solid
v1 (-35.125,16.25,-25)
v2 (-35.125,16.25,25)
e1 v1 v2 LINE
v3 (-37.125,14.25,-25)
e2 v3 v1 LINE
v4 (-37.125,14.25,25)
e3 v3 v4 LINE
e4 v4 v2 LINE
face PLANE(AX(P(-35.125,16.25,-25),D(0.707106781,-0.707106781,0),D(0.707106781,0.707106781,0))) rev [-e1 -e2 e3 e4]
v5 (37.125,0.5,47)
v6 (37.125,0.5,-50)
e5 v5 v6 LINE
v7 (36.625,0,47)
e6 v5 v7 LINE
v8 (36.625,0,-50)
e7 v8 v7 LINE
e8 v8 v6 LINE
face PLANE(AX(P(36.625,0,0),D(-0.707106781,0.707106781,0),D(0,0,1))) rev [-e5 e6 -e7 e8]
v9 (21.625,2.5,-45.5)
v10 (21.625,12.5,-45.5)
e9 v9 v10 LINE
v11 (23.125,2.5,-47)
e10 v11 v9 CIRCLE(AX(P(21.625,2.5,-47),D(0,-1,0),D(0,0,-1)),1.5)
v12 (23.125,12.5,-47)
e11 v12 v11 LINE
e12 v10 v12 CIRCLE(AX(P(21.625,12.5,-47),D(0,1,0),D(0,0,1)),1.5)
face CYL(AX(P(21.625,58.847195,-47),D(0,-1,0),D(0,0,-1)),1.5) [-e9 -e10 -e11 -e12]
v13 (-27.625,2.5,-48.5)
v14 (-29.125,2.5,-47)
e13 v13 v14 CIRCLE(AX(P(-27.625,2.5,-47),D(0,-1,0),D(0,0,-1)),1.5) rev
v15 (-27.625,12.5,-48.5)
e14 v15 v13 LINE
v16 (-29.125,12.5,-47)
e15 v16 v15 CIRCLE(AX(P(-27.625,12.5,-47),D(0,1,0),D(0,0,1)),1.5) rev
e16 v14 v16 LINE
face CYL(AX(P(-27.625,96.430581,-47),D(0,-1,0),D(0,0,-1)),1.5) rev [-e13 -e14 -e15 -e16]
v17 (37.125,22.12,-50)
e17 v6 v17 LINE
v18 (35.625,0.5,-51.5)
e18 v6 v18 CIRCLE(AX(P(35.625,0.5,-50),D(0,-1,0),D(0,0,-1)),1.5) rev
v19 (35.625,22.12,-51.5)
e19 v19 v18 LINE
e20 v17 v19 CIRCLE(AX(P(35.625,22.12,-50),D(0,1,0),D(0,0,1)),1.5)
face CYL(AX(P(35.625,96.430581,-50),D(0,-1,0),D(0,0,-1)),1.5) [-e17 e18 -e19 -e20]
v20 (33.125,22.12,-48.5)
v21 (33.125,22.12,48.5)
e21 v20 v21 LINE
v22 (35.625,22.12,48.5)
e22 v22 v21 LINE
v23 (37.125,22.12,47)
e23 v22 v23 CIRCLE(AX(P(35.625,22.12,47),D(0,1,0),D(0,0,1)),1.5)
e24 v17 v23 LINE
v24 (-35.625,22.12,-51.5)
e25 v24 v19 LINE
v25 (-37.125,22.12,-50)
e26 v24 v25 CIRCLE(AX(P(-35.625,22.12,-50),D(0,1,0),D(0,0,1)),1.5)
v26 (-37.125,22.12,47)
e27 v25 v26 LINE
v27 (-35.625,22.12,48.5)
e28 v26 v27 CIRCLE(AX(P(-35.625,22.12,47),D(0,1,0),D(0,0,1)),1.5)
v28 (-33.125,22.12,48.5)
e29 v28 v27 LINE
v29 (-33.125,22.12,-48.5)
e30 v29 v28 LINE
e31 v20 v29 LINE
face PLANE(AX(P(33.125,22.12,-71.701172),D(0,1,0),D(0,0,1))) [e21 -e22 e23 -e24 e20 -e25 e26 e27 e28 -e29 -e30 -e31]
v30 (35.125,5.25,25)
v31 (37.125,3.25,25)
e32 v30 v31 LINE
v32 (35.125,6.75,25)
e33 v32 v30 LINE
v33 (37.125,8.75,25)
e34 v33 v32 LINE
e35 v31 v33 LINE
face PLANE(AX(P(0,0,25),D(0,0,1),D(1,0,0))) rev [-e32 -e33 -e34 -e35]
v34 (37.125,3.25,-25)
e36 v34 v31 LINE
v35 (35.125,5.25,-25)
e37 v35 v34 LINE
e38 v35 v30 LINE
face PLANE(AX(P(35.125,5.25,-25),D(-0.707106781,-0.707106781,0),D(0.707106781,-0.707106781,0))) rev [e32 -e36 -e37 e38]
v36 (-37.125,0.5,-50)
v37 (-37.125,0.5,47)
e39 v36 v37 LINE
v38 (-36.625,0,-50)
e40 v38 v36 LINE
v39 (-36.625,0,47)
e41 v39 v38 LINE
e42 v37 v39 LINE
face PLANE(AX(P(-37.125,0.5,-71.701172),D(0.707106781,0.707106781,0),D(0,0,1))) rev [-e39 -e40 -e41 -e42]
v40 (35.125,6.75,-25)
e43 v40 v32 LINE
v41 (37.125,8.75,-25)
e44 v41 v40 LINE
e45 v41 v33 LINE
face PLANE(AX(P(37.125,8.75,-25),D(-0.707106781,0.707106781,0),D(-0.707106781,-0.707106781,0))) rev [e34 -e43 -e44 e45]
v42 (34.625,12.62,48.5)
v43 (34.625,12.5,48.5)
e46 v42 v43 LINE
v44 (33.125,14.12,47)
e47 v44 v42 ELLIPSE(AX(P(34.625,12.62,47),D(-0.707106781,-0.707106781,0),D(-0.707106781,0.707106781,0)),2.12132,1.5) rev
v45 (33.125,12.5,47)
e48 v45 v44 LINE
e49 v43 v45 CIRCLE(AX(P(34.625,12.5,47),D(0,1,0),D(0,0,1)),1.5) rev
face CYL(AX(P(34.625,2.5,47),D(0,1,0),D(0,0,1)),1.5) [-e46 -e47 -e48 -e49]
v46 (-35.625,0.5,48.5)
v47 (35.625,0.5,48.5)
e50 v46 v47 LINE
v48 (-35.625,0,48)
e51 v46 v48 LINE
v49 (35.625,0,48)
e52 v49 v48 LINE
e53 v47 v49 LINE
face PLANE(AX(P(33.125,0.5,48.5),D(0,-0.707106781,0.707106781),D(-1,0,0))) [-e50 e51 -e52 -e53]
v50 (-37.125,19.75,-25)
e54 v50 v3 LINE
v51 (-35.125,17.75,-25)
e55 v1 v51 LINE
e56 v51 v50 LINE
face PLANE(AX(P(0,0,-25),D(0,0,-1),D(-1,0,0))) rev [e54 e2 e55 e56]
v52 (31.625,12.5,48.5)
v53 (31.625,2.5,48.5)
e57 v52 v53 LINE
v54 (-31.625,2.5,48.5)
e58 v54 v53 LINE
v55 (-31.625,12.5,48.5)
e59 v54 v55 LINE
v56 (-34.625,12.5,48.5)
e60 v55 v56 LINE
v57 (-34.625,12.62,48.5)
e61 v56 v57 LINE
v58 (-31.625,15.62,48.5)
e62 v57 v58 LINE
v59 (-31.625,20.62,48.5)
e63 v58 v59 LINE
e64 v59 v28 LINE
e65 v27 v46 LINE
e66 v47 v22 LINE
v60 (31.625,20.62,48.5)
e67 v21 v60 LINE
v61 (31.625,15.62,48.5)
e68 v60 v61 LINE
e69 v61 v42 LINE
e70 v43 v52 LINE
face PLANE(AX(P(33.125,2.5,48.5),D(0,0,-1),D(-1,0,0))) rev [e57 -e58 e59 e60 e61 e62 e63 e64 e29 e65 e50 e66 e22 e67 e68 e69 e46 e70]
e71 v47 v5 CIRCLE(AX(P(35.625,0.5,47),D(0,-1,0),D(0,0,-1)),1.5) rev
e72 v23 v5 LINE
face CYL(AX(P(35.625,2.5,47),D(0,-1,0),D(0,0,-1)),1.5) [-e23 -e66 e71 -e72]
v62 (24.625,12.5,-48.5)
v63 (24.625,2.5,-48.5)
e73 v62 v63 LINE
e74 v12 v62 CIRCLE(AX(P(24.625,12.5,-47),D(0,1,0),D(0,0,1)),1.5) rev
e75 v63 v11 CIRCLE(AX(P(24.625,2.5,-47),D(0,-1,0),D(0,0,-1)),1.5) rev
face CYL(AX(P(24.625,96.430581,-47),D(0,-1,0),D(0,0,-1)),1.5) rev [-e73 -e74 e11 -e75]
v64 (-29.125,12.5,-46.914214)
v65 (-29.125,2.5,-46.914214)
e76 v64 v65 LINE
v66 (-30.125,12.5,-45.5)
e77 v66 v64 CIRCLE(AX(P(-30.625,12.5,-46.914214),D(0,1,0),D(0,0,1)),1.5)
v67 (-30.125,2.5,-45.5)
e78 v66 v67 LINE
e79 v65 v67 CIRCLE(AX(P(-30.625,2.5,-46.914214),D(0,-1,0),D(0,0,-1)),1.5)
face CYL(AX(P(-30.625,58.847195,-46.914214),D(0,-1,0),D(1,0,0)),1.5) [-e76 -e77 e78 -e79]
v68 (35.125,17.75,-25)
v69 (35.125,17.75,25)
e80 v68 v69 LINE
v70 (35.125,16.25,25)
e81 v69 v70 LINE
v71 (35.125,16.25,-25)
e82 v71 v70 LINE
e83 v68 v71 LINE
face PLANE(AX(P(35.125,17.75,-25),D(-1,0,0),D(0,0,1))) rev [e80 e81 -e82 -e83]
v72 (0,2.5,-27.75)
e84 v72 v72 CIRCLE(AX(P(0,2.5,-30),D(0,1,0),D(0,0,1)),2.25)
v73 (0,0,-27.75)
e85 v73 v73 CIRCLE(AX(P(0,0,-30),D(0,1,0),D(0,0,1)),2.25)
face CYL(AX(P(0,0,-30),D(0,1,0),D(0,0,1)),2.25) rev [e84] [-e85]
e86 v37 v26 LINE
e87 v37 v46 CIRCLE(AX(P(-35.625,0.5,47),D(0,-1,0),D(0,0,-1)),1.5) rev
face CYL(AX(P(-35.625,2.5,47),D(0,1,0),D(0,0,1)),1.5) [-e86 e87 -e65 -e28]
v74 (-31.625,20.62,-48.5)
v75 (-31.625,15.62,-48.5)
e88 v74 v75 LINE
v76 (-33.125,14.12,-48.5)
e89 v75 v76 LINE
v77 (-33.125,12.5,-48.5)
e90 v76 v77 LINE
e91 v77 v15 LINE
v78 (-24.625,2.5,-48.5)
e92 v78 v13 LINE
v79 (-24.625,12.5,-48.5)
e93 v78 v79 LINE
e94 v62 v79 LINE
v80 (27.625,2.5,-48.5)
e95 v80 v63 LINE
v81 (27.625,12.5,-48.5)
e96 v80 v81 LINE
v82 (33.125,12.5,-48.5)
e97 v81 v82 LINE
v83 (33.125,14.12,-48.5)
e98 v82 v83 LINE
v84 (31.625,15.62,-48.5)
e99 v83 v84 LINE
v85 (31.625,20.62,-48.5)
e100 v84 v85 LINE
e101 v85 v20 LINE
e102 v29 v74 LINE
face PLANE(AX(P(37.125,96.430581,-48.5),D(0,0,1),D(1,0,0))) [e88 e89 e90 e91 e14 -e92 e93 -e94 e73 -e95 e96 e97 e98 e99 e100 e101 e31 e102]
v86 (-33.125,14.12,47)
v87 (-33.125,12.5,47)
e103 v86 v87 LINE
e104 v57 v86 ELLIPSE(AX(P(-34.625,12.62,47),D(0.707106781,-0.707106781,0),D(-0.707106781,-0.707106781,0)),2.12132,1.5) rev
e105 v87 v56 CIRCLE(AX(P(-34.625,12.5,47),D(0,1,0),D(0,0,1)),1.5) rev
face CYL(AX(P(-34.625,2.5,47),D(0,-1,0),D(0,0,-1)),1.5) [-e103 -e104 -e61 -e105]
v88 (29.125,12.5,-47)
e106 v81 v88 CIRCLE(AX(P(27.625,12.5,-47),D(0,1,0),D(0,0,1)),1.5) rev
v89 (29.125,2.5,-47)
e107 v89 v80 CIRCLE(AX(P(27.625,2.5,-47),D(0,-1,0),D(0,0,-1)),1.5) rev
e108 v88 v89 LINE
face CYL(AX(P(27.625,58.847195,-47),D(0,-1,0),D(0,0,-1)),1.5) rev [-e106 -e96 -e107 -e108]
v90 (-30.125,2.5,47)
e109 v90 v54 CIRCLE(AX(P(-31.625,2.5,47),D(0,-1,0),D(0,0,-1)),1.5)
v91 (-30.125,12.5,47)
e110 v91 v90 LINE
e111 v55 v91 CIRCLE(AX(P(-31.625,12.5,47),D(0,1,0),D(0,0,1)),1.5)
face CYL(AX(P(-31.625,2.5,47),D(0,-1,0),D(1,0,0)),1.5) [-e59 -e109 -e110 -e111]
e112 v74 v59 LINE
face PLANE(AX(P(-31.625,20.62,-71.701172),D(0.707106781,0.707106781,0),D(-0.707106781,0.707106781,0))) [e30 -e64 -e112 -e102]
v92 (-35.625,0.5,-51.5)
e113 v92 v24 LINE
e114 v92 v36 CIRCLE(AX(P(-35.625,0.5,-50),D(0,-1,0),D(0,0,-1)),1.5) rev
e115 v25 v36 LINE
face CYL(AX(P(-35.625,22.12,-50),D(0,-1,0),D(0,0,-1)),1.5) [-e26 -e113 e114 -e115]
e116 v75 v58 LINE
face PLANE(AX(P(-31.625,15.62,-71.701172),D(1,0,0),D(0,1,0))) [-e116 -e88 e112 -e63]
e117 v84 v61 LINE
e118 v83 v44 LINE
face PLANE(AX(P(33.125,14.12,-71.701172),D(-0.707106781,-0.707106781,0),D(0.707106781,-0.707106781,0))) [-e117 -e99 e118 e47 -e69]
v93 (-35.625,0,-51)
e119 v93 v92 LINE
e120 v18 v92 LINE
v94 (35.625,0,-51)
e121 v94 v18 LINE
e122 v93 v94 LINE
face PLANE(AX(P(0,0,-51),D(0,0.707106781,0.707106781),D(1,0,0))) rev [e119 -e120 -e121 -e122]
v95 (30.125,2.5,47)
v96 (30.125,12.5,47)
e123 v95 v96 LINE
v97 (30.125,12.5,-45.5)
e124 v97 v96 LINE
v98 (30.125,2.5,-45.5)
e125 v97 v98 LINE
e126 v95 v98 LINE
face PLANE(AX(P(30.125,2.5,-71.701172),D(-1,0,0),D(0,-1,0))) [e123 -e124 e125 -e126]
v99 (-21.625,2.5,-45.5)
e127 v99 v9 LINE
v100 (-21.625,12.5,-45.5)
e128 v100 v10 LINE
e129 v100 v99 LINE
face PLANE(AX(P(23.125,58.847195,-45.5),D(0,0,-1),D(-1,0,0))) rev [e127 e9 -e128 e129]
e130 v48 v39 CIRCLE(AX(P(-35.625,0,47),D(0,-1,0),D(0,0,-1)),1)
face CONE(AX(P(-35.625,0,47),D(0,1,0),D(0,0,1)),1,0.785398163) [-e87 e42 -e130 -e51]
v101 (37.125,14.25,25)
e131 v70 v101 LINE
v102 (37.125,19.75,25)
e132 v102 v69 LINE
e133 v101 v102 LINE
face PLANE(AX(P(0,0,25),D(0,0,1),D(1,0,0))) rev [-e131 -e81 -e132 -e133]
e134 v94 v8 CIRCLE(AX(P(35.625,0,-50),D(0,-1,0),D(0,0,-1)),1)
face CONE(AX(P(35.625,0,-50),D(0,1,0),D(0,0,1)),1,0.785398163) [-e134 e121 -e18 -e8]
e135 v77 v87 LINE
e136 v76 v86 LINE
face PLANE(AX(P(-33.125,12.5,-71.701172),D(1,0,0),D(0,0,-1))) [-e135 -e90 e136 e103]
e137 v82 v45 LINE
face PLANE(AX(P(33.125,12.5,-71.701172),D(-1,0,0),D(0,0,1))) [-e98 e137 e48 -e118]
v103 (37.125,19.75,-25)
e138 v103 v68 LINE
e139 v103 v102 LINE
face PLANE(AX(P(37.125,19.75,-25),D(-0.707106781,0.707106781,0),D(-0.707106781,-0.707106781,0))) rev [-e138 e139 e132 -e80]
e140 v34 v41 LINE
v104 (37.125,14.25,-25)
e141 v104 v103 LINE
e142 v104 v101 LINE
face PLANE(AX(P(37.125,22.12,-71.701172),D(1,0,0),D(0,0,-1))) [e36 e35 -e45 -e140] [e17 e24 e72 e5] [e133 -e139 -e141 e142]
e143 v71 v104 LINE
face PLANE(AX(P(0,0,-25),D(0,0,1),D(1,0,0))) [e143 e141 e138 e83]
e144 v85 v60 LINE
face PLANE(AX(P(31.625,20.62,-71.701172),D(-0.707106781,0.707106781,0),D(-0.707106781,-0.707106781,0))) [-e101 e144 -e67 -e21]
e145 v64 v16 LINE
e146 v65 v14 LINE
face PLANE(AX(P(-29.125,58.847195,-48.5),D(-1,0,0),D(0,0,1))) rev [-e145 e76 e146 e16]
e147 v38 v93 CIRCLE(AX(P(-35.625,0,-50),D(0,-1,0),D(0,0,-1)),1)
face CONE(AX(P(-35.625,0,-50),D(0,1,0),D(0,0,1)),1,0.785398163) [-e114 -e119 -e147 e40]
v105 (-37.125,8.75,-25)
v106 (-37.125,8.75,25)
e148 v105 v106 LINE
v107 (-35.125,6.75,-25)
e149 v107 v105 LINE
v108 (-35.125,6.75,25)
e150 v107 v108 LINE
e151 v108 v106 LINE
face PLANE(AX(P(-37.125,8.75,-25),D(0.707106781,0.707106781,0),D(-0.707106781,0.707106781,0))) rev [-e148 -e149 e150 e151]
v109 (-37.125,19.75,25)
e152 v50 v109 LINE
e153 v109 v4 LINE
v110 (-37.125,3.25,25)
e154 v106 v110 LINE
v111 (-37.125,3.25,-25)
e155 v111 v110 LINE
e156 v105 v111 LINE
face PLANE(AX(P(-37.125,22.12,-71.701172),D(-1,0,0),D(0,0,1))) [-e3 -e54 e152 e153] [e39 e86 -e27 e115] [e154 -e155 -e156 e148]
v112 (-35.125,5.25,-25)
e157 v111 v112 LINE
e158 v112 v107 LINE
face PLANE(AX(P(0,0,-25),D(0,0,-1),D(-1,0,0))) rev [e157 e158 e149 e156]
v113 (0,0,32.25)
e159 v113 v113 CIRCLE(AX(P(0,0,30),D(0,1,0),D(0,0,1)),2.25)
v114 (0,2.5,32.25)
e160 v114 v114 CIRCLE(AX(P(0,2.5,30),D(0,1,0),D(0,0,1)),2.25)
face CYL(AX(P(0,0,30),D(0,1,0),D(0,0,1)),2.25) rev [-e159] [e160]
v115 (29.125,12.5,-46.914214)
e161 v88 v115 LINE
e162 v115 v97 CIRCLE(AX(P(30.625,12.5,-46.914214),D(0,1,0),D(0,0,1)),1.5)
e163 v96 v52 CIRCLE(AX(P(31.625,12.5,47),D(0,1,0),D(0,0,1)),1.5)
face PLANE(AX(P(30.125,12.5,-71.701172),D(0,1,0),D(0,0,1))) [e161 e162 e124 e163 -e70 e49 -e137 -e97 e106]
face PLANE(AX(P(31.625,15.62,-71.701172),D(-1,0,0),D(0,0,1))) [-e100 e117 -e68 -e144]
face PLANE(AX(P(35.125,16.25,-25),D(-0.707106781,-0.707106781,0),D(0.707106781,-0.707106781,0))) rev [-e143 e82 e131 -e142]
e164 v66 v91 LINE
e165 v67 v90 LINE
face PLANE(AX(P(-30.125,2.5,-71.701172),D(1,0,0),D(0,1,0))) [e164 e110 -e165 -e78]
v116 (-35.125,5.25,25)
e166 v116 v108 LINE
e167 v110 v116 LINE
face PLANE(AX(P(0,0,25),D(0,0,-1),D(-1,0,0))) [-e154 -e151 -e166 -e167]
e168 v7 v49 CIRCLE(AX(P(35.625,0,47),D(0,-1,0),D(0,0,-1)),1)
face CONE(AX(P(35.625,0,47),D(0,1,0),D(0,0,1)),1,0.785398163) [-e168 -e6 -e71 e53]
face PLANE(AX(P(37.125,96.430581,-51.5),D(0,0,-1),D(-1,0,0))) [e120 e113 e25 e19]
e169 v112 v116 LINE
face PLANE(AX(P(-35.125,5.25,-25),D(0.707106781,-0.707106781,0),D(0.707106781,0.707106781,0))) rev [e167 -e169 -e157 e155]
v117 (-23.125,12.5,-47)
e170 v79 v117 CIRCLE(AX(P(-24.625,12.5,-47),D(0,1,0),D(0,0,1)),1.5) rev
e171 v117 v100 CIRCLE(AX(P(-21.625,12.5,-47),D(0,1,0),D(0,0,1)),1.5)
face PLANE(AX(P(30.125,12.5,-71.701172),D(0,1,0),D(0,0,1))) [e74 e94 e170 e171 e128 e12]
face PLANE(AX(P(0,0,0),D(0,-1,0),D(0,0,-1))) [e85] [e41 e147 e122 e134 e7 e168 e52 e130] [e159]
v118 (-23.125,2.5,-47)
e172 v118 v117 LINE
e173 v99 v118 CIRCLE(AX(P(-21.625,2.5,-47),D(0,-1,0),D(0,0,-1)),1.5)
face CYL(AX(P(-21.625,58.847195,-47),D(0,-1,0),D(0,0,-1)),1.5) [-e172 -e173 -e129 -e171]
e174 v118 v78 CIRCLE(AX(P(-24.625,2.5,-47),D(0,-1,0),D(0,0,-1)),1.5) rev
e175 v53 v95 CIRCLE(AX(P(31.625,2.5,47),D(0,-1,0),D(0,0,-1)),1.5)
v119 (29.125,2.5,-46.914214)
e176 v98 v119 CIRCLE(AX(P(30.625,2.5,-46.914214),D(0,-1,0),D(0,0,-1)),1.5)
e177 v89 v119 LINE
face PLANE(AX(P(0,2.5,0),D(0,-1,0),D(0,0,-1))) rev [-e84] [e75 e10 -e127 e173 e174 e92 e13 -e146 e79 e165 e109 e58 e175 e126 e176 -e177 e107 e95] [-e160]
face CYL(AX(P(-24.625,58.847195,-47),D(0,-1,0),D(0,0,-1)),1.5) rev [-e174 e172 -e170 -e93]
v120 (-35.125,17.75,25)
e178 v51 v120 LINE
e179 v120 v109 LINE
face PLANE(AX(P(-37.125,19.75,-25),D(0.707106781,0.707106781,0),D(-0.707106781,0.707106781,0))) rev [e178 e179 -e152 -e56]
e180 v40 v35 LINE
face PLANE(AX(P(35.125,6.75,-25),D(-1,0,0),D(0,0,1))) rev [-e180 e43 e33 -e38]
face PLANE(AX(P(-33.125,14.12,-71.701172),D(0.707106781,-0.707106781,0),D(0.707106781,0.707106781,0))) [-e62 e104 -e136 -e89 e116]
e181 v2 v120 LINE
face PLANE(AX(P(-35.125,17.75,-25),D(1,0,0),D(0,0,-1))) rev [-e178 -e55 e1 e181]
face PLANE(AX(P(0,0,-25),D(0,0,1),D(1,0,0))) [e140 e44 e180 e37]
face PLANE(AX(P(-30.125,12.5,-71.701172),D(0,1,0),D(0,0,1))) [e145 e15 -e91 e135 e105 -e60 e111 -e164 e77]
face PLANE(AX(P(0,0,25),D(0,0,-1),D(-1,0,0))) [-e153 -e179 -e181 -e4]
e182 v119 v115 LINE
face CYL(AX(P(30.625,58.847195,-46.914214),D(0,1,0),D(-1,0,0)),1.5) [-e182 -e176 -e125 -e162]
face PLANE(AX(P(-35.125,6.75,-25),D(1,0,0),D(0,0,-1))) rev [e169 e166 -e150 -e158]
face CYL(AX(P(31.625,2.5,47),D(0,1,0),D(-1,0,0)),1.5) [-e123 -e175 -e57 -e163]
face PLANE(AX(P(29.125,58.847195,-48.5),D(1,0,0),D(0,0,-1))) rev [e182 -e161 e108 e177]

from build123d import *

# Parameters (mm, degrees)
SKETCH1_W           = 66.25
SKETCH1_H           = 97
BOSS_EXTRUDE1_DEPTH = 2.5
BOSS_EXTRUDE2_DEPTH = 97
SKETCH3_W           = 1
SKETCH3_H           = 3
BOSS_EXTRUDE3_DEPTH = 10
SKETCH4_W           = 74.25
SKETCH4_H           = 3
BOSS_EXTRUDE4_DEPTH = 22.12
SKETCH6_R           = 2.25
CUT_EXTRUDE1_DEPTH  = 67.448927945
FILLET1_R           = 1.5
CUT_EXTRUDE2_DEPTH  = 25
CHAMFER1_SIZE       = 0.5


with BuildPart() as part:
    # Sketch1 → Boss-Extrude1 (new body)
    with BuildSketch(Plane(origin=(0, 0, 0), x_dir=(1, 0, 0), z_dir=(0, 1, 0))):
        Rectangle(SKETCH1_W, SKETCH1_H)
    extrude(amount=BOSS_EXTRUDE1_DEPTH)

    # Sketch2 → Boss-Extrude2 (add)
    with BuildSketch(Plane.XY.offset(48.5)):
        Polygon((30.125, 2.5), (30.125, 12.5), (33.125, 12.5), (33.125, 14.12), (31.625, 15.62), (31.625, 20.62), (33.125, 22.12), (37.125, 22.12), (37.125, 0), (30.125, 0), align=None)
        Polygon((-31.625, 20.62), (-33.125, 22.12), (-37.125, 22.12), (-37.125, 0), (-30.125, 0), (-30.125, 2.5), (-30.125, 12.5), (-33.125, 12.5), (-33.125, 14.12), (-31.625, 15.62), align=None)
    extrude(amount=-BOSS_EXTRUDE2_DEPTH)

    # Sketch3 → Boss-Extrude3 (add)
    with BuildSketch(Plane(origin=(0, 2.5, 0), x_dir=(1, 0, 0), z_dir=(0, 1, 0))):
        Polygon((-23.125, 48.5), (-23.125, 45.5), (23.125, 45.5), (23.125, 48.5), (0, 48.5), align=None)
        with Locations((29.625, 47)):
            Rectangle(SKETCH3_W, SKETCH3_H)
        with Locations((-29.625, 47)):
            Rectangle(SKETCH3_W, SKETCH3_H)
    extrude(amount=BOSS_EXTRUDE3_DEPTH)

    # Sketch4 → Boss-Extrude4 (add)
    with BuildSketch(Plane.XZ):
        with Locations((0, -50)):
            Rectangle(SKETCH4_W, SKETCH4_H)
    extrude(amount=-BOSS_EXTRUDE4_DEPTH)

    # Sketch6 → Cut-Extrude1 (cut, through all)
    with BuildSketch(Plane(origin=(0, 2.5, 0), x_dir=(1, 0, 0), z_dir=(0, 1, 0))):
        with Locations(Location((0, 30, 0), (0, 0, 270))):
            Circle(SKETCH6_R)
        with Locations(Location((0, -30, 0), (0, 0, 270))):
            Circle(SKETCH6_R)
    extrude(amount=-CUT_EXTRUDE1_DEPTH, mode=Mode.SUBTRACT)

    # Fillet1
    # the kernel refuses this fillet: 1.5 mm, written as the material it adds along each edge
    with BuildSketch(Plane(origin=(29.125, 2.5, -48.5), x_dir=(-1, 0, 0), z_dir=(0, 1, 0)), Plane(origin=(-23.125, 2.5, -48.5), x_dir=(-1, 0, 0), z_dir=(0, 1, 0))) as fillet1_piece_1:
        with BuildLine():
            CenterArc((FILLET1_R, FILLET1_R), FILLET1_R, 180, 90)
            Line((0, FILLET1_R), (0, 0))
            Line((0, 0), (FILLET1_R, 0))
        make_face()
    extrude(amount=10)
    with BuildSketch(Plane(origin=(23.125, 2.5, -48.5), x_dir=(1, 0, 0), z_dir=(0, 1, 0)), Plane(origin=(-29.125, 2.5, -48.5), x_dir=(1, 0, 0), z_dir=(0, 1, 0))) as fillet1_piece_2:
        with BuildLine():
            CenterArc((FILLET1_R, -FILLET1_R), FILLET1_R, 90, 90)
            Line((0, -FILLET1_R), (0, 0))
            Line((0, 0), (FILLET1_R, 0))
        make_face()
    extrude(amount=10)
    # the kernel refuses this fillet: 1.5 mm, written as the material it takes off along each edge
    with BuildSketch(Plane(origin=(-33.125, 12.5, 48.5), x_dir=(-1, 0, 0), z_dir=(0, 1, 0))) as fillet1_2_piece_1_section:
        with BuildLine():
            CenterArc((FILLET1_R, -FILLET1_R), FILLET1_R, 90, 90)
            Line((0, -FILLET1_R), (0, 0))
            Line((0, 0), (FILLET1_R, 0))
        make_face()
    fillet1_2_piece_1 = extrude(amount=5.37, mode=Mode.PRIVATE)
    fillet1_2_piece_1 = split(fillet1_2_piece_1, bisect_by=Plane(origin=(-33.935, 13.31, 48.5), z_dir=(0.7071067811865467, -0.7071067811865483, 0)), keep=Keep.TOP, mode=Mode.PRIVATE)
    add(fillet1_2_piece_1, mode=Mode.SUBTRACT)
    with BuildSketch(Plane(origin=(33.125, 12.5, 48.5), x_dir=(1, 0, 0), z_dir=(0, 1, 0))) as fillet1_2_piece_2_section:
        with BuildLine():
            CenterArc((FILLET1_R, FILLET1_R), FILLET1_R, 180, 90)
            Line((0, FILLET1_R), (0, 0))
            Line((0, 0), (FILLET1_R, 0))
        make_face()
    fillet1_2_piece_2 = extrude(amount=5.37, mode=Mode.PRIVATE)
    fillet1_2_piece_2 = split(fillet1_2_piece_2, bisect_by=Plane(origin=(33.935, 13.31, 48.5), z_dir=(-0.7071067811865438, -0.7071067811865512, 0)), keep=Keep.TOP, mode=Mode.PRIVATE)
    add(fillet1_2_piece_2, mode=Mode.SUBTRACT)
    with BuildSketch(Plane(origin=(-30.125, 16.25, 48.5), x_dir=(-1, 0, 0), z_dir=(0, -1, 0)), Plane(origin=(30.125, 2.5, 48.5), x_dir=(1, 0, 0), z_dir=(0, 1, 0)), Plane(origin=(-23.125, 2.5, -45.5), x_dir=(1, 0, 0), z_dir=(0, 1, 0)), Plane(origin=(23.125, 2.5, -45.5), x_dir=(0, 0, -1), z_dir=(0, 1, 0))) as fillet1_2_piece_3:
        with BuildLine():
            CenterArc((FILLET1_R, FILLET1_R), FILLET1_R, 180, 90)
            Line((0, FILLET1_R), (0, 0))
            Line((0, 0), (FILLET1_R, 0))
        make_face()
    extrude(amount=13.75, mode=Mode.SUBTRACT)
    with BuildSketch(Plane(origin=(29.125, 2.5, -45.5), x_dir=(0, 0, -1), z_dir=(0, 1, 0))) as fillet1_2_piece_4:
        with BuildLine():
            CenterArc((1.414213562, -1.5), FILLET1_R, 90, 70.528779366)
            Line((0, -1), (0, 0))
            Line((0, 0), (1.414213562, 0))
        make_face()
    extrude(amount=13.535533906, mode=Mode.SUBTRACT)
    with BuildSketch(Plane(origin=(-29.125, 2.5, -45.5), x_dir=(0, 0, -1), z_dir=(0, 1, 0))) as fillet1_2_piece_5:
        with BuildLine():
            CenterArc((1.414213562, 1.5), FILLET1_R, 199.471220634, 70.528779366)
            Line((0, 1), (0, 0))
            Line((0, 0), (1.414213562, 0))
        make_face()
    extrude(amount=13.535533906, mode=Mode.SUBTRACT)
    with BuildSketch(Plane(origin=(37.125, 25.87, 48.5), x_dir=(-1, 0, 0), z_dir=(0, -1, 0)), Plane(origin=(-37.125, 25.87, 48.5), x_dir=(0, 0, -1), z_dir=(0, -1, 0)), Plane(origin=(-37.125, -3.75, -51.5), x_dir=(0, 0, 1), z_dir=(0, 1, 0))) as fillet1_2_piece_6:
        with BuildLine():
            CenterArc((FILLET1_R, FILLET1_R), FILLET1_R, 180, 90)
            Line((0, FILLET1_R), (0, 0))
            Line((0, 0), (FILLET1_R, 0))
        make_face()
    extrude(amount=29.62, mode=Mode.SUBTRACT)
    with BuildSketch(Plane(origin=(37.125, -3.75, -51.5), x_dir=(0, 0, 1), z_dir=(0, 1, 0))) as fillet1_2_piece_7:
        with BuildLine():
            CenterArc((FILLET1_R, -FILLET1_R), FILLET1_R, 90, 90)
            Line((0, -FILLET1_R), (0, 0))
            Line((0, 0), (FILLET1_R, 0))
        make_face()
    extrude(amount=29.62, mode=Mode.SUBTRACT)

    # Sketch7 → Cut-Extrude2 (cut, symmetric)
    with BuildSketch(Plane.XY):
        Polygon((-37.125, 8.75), (-35.125, 6.75), (-35.125, 5.25), (-37.125, 3.25), align=None)
        Polygon((-37.125, 19.75), (-35.125, 17.75), (-35.125, 16.25), (-37.125, 14.25), align=None)
        Polygon((37.125, 19.75), (37.125, 14.25), (35.125, 16.25), (35.125, 17.75), align=None)
        Polygon((37.125, 8.75), (37.125, 3.25), (35.125, 5.25), (35.125, 6.75), align=None)
    extrude(amount=CUT_EXTRUDE2_DEPTH, both=True, mode=Mode.SUBTRACT)

    # Chamfer1
    chamfer1_edges = [part.edges().sort_by_distance(p)[0] for p in [
        (0, 0, 48.5),
        (37.125, 0, -1.5),
        (-37.125, 0, -1.5),
        (0, 0, -51.5),
        (36.685660172, 0, -51.060660172),
        (-36.685660172, 0, -51.060660172),
        (-36.685660172, 0, 48.060660172),
        (36.685660172, 0, 48.060660172),
    ]]
    chamfer(chamfer1_edges, length=CHAMFER1_SIZE)


solid = part.part
